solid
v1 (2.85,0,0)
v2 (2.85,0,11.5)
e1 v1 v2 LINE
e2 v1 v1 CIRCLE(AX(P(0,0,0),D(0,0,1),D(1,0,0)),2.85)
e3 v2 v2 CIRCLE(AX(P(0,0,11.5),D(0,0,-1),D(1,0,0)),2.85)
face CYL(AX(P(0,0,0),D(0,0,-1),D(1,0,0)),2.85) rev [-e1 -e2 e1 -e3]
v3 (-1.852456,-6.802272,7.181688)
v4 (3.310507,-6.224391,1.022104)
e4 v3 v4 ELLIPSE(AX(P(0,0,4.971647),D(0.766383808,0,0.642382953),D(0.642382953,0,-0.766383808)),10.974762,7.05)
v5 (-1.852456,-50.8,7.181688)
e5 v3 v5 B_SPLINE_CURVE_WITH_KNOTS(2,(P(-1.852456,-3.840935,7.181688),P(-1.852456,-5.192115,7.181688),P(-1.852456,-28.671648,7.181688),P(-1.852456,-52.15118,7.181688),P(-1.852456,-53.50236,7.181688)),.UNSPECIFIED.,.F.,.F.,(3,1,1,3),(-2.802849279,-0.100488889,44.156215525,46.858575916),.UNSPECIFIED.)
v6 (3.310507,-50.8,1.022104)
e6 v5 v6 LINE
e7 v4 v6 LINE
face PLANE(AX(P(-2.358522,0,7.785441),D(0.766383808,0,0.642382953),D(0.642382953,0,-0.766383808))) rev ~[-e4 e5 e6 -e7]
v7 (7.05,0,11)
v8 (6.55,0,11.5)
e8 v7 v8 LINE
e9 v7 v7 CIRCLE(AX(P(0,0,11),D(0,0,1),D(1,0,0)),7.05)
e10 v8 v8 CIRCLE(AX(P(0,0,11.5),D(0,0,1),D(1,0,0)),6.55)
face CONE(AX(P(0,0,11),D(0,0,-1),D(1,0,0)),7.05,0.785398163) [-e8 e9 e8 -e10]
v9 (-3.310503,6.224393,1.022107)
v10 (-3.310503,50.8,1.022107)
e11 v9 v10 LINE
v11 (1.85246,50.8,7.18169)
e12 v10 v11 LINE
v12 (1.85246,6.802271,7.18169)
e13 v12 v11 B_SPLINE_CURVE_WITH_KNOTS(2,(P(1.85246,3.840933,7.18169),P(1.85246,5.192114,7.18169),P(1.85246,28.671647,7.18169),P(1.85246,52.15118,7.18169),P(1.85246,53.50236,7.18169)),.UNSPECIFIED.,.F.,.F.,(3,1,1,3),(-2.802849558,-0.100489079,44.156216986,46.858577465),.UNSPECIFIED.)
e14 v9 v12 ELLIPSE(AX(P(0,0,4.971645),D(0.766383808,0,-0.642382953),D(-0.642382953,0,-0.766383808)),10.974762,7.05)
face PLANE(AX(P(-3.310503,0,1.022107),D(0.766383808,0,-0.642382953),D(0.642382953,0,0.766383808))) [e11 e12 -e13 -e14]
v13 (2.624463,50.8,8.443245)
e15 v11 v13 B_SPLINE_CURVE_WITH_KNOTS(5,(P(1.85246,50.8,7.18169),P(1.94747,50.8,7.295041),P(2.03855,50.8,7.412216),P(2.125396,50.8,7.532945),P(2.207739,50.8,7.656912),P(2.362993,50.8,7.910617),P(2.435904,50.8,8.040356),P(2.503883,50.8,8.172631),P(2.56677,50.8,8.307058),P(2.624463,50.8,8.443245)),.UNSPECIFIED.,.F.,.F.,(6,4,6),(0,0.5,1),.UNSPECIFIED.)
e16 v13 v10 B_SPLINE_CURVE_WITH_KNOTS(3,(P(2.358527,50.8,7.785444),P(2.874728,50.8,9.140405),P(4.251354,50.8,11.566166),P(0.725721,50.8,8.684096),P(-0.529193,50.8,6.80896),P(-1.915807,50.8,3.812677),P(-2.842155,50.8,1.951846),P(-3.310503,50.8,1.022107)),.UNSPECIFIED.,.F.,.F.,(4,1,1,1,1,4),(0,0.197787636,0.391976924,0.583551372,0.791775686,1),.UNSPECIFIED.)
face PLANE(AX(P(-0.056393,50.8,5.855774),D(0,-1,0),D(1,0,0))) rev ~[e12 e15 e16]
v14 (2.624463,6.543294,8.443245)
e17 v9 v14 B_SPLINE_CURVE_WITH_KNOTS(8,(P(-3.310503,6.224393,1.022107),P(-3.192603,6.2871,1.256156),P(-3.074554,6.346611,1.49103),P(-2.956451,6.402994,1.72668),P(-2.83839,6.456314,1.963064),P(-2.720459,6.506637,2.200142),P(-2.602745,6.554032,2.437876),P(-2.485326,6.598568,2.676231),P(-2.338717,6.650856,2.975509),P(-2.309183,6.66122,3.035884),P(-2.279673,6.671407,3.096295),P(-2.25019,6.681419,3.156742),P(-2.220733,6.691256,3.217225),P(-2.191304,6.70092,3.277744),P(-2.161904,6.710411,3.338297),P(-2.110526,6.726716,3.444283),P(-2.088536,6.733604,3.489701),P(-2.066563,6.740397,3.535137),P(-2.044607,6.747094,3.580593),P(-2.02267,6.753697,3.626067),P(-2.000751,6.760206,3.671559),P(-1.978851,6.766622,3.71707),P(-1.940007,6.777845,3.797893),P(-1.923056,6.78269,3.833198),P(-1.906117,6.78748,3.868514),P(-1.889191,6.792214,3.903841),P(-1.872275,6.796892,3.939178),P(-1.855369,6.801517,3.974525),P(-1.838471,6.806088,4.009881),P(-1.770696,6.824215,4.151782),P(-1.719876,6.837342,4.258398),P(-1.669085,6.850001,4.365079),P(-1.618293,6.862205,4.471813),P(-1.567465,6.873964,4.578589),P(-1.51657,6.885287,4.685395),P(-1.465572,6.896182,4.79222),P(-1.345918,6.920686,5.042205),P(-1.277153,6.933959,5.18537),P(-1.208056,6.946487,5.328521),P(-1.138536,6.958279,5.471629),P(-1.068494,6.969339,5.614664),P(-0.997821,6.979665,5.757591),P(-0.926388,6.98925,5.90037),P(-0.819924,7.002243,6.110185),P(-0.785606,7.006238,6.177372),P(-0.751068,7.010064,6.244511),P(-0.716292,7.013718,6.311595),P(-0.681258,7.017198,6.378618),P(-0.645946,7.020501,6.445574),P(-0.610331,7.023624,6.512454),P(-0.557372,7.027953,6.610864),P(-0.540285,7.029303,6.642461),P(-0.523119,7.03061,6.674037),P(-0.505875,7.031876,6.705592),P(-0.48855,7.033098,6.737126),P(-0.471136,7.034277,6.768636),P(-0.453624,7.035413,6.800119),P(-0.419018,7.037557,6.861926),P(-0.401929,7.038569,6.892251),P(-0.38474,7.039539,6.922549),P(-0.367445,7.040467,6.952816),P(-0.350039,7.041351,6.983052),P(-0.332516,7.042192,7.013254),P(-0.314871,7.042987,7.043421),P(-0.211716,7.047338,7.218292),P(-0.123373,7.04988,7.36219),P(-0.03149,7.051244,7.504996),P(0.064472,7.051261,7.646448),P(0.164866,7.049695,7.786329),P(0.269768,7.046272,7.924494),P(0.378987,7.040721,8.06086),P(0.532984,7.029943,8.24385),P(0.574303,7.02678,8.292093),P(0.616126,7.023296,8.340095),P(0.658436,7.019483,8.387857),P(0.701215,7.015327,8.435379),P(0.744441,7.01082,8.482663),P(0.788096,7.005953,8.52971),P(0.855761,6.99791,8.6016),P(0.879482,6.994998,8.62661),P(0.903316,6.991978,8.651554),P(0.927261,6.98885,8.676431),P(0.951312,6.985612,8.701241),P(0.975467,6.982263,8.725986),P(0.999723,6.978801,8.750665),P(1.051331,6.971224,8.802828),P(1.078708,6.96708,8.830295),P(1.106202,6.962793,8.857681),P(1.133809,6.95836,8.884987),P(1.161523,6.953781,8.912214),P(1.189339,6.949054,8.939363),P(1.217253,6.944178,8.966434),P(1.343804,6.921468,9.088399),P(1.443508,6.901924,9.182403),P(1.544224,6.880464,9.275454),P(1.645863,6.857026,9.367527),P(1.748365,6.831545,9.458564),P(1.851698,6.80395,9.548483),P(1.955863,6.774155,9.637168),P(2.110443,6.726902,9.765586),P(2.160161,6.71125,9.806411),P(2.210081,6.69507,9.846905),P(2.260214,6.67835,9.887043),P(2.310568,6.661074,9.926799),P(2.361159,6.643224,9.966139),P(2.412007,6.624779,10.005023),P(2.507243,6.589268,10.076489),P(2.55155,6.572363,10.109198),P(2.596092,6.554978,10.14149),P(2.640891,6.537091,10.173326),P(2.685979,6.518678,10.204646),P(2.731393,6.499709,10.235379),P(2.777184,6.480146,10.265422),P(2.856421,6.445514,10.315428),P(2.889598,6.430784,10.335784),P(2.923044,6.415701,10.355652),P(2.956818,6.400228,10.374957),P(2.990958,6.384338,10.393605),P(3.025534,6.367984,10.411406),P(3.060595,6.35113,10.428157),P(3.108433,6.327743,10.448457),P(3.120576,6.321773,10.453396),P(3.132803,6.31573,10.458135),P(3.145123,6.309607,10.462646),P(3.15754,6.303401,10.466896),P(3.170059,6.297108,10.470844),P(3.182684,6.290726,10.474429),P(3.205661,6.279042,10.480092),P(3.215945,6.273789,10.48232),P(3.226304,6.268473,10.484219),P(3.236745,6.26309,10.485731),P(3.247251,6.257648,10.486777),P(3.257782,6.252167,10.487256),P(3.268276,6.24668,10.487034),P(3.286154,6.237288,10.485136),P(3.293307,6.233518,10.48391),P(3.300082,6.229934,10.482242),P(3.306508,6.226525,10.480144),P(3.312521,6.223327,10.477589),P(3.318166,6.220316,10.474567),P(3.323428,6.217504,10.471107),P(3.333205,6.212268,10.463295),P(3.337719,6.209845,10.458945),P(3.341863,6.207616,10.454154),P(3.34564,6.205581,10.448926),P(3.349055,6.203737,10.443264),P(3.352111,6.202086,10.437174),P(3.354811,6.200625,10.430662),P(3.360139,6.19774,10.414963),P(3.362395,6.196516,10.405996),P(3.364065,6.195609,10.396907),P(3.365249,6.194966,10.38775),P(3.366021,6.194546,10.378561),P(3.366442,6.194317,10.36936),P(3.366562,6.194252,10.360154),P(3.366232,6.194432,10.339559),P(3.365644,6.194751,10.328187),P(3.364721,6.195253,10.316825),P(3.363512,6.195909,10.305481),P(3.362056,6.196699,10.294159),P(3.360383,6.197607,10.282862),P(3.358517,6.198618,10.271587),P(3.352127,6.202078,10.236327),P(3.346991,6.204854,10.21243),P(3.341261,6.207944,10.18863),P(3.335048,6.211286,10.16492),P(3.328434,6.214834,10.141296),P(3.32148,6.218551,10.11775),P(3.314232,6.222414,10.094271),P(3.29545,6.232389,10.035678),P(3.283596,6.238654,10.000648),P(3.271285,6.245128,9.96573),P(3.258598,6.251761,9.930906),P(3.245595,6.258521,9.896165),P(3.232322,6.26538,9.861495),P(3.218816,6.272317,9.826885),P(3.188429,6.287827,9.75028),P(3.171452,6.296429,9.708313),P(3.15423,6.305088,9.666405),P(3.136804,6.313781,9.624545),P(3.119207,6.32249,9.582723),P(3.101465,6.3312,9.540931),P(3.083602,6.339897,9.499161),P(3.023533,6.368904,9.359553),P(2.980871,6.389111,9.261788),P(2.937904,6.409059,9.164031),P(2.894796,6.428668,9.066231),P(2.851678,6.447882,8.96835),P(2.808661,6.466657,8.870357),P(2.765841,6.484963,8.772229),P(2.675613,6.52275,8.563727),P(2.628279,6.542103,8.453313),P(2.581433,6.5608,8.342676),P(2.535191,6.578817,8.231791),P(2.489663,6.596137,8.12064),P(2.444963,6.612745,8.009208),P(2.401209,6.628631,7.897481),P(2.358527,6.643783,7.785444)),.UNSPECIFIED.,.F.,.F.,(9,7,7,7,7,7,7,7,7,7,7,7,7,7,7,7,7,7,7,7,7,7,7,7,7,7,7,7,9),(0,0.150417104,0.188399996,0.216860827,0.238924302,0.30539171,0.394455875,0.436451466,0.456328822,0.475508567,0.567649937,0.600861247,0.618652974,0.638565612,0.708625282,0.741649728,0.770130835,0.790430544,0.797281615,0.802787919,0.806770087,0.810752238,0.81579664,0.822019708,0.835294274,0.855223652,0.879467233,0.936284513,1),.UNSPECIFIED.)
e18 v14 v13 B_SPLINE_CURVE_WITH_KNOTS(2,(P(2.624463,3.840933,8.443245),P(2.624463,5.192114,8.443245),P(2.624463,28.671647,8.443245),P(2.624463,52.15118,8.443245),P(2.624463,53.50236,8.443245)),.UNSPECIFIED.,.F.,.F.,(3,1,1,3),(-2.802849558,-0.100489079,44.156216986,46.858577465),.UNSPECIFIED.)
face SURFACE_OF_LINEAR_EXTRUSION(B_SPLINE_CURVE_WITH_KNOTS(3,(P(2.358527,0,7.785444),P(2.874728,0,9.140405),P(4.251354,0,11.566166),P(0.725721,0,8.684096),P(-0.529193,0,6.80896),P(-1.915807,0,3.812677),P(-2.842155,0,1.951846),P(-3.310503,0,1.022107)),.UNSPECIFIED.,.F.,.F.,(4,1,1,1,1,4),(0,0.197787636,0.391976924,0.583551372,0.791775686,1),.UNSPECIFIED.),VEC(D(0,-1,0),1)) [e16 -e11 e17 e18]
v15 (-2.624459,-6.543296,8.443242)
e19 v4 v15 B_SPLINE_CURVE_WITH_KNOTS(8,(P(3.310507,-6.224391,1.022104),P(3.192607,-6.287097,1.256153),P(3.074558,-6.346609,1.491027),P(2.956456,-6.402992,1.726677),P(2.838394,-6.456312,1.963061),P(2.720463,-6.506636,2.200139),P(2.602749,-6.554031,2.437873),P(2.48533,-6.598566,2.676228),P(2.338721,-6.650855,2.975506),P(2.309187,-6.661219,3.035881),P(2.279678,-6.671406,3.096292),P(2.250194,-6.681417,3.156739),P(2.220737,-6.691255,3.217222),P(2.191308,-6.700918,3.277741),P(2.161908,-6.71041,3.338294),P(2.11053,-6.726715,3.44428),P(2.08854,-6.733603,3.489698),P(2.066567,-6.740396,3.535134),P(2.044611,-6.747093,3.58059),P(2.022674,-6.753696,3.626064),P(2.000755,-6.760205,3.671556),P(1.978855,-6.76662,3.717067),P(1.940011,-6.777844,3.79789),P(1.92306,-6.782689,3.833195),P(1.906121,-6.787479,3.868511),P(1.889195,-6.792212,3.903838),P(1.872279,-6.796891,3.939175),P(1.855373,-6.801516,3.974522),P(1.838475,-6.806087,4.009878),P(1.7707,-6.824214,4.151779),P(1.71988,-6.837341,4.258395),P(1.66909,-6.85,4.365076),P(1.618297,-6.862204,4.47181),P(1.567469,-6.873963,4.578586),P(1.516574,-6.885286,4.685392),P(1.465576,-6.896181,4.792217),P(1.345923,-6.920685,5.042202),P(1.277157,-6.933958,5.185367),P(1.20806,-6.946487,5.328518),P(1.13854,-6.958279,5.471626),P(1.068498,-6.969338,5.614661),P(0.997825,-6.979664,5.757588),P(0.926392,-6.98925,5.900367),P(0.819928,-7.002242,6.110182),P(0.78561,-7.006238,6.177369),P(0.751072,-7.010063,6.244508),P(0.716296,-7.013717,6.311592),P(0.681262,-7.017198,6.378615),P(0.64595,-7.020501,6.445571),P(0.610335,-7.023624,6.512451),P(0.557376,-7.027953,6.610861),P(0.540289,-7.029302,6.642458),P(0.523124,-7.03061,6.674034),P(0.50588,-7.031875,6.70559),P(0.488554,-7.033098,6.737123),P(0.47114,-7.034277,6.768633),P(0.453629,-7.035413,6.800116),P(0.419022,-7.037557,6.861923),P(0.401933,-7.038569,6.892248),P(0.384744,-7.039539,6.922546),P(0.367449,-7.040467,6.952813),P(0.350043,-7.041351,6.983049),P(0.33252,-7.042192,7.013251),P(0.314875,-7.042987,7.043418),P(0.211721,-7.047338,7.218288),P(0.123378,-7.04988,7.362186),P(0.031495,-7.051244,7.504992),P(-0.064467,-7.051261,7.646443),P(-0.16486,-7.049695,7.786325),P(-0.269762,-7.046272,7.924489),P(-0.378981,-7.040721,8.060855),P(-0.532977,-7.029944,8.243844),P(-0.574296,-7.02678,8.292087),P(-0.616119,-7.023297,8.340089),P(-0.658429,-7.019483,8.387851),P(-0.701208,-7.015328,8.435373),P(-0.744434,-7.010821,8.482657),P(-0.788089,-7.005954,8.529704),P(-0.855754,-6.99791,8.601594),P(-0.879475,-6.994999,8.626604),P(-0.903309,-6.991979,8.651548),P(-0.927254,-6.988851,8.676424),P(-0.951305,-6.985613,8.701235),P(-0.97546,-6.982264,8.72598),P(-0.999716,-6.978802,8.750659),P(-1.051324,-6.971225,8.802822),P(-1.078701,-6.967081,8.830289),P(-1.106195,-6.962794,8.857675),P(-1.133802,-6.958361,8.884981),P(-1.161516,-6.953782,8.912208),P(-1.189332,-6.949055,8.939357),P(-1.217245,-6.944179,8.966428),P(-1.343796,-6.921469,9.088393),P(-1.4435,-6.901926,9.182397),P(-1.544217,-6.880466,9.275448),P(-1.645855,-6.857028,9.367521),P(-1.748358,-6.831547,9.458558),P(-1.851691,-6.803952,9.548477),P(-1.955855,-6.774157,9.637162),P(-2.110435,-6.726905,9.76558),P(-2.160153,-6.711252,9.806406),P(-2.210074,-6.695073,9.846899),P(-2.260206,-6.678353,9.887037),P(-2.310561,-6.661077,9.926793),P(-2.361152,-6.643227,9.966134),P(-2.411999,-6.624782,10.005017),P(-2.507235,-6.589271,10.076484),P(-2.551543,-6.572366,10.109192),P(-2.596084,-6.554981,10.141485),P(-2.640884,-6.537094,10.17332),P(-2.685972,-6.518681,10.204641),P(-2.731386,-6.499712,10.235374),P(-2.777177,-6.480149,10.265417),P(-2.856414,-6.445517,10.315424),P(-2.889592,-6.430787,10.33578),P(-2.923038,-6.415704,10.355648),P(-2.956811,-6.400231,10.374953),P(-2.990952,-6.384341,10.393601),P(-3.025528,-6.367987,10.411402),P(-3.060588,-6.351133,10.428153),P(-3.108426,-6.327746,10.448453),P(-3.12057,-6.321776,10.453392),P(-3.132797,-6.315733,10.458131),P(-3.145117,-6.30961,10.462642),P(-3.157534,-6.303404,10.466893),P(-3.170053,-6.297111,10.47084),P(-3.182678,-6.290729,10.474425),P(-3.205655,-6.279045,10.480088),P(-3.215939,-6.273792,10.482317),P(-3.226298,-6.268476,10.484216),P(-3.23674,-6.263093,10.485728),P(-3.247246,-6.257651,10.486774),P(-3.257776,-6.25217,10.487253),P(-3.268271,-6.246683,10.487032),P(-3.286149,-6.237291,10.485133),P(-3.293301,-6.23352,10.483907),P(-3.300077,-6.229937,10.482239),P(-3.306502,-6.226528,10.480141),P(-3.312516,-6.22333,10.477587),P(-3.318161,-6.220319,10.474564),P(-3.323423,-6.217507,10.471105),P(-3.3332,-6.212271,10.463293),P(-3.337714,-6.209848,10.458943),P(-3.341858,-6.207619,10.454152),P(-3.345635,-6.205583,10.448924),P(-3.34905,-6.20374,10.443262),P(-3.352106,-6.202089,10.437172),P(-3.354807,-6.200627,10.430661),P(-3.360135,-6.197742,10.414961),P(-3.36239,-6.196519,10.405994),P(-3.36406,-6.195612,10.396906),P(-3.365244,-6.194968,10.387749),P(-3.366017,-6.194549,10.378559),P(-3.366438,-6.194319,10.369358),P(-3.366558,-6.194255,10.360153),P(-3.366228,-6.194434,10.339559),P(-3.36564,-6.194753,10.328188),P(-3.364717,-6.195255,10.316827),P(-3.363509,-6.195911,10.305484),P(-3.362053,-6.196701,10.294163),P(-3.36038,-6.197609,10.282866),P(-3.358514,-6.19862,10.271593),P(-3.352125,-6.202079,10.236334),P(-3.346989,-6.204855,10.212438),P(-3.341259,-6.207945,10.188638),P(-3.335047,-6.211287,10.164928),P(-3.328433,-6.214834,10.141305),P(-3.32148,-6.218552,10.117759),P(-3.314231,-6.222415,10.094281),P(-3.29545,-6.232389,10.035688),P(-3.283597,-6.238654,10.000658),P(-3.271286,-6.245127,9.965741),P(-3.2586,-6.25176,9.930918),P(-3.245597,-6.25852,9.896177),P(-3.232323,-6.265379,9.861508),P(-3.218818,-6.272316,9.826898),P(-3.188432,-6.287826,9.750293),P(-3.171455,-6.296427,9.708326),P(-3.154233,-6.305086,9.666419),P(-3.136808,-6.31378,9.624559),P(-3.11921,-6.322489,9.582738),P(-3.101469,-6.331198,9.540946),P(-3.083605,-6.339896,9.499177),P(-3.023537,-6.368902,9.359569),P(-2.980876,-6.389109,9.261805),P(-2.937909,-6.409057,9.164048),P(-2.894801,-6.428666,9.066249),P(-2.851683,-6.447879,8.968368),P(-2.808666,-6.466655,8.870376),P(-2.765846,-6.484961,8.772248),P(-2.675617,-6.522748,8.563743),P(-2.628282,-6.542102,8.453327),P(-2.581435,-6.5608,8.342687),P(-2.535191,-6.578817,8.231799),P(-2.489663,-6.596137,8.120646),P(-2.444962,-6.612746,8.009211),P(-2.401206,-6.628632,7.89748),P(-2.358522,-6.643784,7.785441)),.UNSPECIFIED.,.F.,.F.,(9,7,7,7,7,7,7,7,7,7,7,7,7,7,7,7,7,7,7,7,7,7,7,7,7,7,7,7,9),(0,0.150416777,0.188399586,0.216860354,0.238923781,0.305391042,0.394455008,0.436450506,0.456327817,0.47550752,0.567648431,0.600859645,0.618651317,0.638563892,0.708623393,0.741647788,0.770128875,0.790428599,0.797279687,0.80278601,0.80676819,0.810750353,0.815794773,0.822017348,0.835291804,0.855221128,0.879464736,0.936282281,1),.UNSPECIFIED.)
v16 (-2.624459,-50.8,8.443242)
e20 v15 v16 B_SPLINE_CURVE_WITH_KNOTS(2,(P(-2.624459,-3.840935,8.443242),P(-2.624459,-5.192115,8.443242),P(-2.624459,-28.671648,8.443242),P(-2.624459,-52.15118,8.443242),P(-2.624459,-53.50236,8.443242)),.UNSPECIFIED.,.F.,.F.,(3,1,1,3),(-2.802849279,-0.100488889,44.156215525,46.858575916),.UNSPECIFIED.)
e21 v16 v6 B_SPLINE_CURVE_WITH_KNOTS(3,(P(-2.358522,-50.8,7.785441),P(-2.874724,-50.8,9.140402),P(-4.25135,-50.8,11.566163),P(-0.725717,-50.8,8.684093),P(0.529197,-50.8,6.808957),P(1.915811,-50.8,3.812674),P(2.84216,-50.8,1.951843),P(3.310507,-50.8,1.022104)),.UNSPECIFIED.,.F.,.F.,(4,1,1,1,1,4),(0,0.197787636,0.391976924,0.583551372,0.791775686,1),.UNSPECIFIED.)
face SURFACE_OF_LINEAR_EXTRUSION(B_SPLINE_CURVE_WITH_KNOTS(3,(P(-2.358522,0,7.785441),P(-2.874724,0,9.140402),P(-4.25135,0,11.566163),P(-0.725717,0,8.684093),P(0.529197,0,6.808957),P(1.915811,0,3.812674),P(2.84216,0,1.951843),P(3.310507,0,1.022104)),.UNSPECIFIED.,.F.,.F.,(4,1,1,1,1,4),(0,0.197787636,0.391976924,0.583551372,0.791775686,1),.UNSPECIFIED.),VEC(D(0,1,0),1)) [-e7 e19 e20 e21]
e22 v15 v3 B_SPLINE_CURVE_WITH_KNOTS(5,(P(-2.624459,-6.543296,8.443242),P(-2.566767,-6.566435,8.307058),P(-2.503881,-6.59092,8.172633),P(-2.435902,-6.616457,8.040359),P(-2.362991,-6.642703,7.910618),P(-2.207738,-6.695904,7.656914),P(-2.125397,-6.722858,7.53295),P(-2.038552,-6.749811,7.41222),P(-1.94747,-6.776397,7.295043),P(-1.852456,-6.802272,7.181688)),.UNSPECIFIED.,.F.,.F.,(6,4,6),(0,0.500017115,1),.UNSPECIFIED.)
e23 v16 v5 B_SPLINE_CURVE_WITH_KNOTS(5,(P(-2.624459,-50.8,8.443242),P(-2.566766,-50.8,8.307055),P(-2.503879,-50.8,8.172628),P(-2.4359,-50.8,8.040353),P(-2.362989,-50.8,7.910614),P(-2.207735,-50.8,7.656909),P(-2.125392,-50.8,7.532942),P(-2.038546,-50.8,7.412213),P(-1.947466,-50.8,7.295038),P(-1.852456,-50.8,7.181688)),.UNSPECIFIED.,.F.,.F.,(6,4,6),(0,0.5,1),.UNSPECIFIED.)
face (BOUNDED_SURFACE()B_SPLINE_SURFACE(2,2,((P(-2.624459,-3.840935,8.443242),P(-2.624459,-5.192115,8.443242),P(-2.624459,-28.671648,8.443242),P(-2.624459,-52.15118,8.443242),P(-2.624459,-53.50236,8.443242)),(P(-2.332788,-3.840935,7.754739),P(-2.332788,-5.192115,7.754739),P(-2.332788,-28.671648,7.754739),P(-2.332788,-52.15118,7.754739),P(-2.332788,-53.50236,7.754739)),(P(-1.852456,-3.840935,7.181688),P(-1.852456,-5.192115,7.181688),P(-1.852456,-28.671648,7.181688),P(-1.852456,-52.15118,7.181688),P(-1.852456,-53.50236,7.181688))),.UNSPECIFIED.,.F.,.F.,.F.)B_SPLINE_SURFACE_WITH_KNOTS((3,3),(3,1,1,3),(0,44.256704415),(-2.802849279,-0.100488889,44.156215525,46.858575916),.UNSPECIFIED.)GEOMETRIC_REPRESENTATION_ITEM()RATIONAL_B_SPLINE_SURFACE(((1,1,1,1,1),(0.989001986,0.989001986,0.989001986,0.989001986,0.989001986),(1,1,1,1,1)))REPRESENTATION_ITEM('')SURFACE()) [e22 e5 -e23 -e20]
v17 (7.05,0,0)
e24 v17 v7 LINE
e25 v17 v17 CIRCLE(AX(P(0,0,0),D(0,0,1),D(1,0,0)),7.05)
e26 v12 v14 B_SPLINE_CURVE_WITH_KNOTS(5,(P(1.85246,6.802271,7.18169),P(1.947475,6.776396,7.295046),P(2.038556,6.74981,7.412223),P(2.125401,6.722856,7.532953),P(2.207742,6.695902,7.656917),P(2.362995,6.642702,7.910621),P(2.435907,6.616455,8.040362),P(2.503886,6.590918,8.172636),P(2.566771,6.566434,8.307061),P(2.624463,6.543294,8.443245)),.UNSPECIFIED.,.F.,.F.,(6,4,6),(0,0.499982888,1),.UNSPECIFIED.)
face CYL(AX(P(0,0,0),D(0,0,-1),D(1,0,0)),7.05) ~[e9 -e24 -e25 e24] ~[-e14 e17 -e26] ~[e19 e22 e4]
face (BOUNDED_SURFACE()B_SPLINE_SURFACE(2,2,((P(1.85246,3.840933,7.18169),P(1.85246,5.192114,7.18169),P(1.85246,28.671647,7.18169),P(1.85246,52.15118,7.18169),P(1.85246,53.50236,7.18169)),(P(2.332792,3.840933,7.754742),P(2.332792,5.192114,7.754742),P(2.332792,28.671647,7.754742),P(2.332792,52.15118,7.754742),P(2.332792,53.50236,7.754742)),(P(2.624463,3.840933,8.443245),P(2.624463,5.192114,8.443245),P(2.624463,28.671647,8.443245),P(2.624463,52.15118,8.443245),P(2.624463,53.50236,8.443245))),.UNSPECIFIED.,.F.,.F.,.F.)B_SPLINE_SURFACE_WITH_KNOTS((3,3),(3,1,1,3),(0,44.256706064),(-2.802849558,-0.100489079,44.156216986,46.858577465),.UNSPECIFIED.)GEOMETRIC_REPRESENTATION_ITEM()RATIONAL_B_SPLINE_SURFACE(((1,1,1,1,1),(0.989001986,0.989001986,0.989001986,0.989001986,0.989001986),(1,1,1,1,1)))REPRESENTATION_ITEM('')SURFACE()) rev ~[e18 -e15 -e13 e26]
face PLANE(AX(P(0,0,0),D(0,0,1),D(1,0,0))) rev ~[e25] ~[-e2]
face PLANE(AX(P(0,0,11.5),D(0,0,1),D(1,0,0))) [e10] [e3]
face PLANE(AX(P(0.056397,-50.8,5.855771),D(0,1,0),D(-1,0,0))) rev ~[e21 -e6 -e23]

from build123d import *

# Parameters (mm, degrees)
F0_R     = 7.05
F0_R_2   = 2.85
F1_DEPTH = 11.5
F3_DEPTH = 50.8
F4_R     = 5
F6_DEPTH = 50.8
F7_R     = 5
F8_SIZE  = 0.5
F9_DEPTH = 25


# Not quite as in the source:
# - a feature names something its author has since deleted; it is built from what else it names


with BuildPart() as f1:
    # F0 (on Top) → F1 (new body)
    with BuildSketch(Plane.XY):
        Circle(F0_R)
        Circle(F0_R_2, mode=Mode.SUBTRACT)
        Circle(F0_R_2)
    extrude(amount=F1_DEPTH)

    # F2 (on Front) → F3 (join)
    with BuildSketch(Plane.XZ):
        with BuildLine():
            add(Edge.make_bspline(
                [(-2.3585223883, 7.7854411997), (-2.8747237345, 9.1404017243), (-4.2513498132, 11.5661629184), (-0.7257173445, 8.6840933061), (0.5291966234, 6.8089567189), (1.9158112194, 3.812674118), (2.8421595437, 1.9518426304), (3.3105071745, 1.0221040932)],
                knots=[0, 0, 0, 0, 0.1977876363, 0.3919769243, 0.5835513721, 0.7917756861, 1, 1, 1, 1], degree=3))
            Line((-2.3585223883, 7.7854411997), (3.3105071745, 1.0221040932))
        make_face()
    extrude(amount=F3_DEPTH)

    # F4
    f4_edges = [f1.edges().sort_by_distance(p)[0] for p in [
        (-2.358522, -28.721892, 7.785441),
    ]]
    fillet(f4_edges, radius=F4_R)

    # F5 (on Front) → F6 (join)
    with BuildSketch(Plane.XZ):
        with BuildLine():
            Line((-3.3105030617, 1.0221070312), (2.3585265011, 7.7854441377))
            add(Edge.make_bspline(
                [(2.3585265011, 7.7854441377), (2.8747278473, 9.1404046623), (4.251353926, 11.5661658564), (0.7257214573, 8.6840962441), (-0.5291925106, 6.8089596569), (-1.9158071066, 3.812677056), (-2.8421554309, 1.9518455683), (-3.3105030617, 1.0221070312)],
                knots=[0, 0, 0, 0, 0.1977876363, 0.3919769243, 0.5835513721, 0.7917756861, 1, 1, 1, 1], degree=3))
        make_face()
    extrude(amount=-F6_DEPTH)

    # F7
    f7_edges = [f1.edges().sort_by_distance(p)[0] for p in [
        (2.358527, 28.721892, 7.785444),
    ]]
    fillet(f7_edges, radius=F7_R)

    # F8
    f8_edges = [f1.edges().sort_by_distance(p)[0] for p in [
        (-7.05, 0, 11.5),
    ]]
    chamfer(f8_edges, length=F8_SIZE)

    # F0 (on Top) → F9 (cut)
    with BuildSketch(Plane.XY):
        Circle(F0_R_2)
    extrude(amount=F9_DEPTH, mode=Mode.SUBTRACT)


solid = f1.part
